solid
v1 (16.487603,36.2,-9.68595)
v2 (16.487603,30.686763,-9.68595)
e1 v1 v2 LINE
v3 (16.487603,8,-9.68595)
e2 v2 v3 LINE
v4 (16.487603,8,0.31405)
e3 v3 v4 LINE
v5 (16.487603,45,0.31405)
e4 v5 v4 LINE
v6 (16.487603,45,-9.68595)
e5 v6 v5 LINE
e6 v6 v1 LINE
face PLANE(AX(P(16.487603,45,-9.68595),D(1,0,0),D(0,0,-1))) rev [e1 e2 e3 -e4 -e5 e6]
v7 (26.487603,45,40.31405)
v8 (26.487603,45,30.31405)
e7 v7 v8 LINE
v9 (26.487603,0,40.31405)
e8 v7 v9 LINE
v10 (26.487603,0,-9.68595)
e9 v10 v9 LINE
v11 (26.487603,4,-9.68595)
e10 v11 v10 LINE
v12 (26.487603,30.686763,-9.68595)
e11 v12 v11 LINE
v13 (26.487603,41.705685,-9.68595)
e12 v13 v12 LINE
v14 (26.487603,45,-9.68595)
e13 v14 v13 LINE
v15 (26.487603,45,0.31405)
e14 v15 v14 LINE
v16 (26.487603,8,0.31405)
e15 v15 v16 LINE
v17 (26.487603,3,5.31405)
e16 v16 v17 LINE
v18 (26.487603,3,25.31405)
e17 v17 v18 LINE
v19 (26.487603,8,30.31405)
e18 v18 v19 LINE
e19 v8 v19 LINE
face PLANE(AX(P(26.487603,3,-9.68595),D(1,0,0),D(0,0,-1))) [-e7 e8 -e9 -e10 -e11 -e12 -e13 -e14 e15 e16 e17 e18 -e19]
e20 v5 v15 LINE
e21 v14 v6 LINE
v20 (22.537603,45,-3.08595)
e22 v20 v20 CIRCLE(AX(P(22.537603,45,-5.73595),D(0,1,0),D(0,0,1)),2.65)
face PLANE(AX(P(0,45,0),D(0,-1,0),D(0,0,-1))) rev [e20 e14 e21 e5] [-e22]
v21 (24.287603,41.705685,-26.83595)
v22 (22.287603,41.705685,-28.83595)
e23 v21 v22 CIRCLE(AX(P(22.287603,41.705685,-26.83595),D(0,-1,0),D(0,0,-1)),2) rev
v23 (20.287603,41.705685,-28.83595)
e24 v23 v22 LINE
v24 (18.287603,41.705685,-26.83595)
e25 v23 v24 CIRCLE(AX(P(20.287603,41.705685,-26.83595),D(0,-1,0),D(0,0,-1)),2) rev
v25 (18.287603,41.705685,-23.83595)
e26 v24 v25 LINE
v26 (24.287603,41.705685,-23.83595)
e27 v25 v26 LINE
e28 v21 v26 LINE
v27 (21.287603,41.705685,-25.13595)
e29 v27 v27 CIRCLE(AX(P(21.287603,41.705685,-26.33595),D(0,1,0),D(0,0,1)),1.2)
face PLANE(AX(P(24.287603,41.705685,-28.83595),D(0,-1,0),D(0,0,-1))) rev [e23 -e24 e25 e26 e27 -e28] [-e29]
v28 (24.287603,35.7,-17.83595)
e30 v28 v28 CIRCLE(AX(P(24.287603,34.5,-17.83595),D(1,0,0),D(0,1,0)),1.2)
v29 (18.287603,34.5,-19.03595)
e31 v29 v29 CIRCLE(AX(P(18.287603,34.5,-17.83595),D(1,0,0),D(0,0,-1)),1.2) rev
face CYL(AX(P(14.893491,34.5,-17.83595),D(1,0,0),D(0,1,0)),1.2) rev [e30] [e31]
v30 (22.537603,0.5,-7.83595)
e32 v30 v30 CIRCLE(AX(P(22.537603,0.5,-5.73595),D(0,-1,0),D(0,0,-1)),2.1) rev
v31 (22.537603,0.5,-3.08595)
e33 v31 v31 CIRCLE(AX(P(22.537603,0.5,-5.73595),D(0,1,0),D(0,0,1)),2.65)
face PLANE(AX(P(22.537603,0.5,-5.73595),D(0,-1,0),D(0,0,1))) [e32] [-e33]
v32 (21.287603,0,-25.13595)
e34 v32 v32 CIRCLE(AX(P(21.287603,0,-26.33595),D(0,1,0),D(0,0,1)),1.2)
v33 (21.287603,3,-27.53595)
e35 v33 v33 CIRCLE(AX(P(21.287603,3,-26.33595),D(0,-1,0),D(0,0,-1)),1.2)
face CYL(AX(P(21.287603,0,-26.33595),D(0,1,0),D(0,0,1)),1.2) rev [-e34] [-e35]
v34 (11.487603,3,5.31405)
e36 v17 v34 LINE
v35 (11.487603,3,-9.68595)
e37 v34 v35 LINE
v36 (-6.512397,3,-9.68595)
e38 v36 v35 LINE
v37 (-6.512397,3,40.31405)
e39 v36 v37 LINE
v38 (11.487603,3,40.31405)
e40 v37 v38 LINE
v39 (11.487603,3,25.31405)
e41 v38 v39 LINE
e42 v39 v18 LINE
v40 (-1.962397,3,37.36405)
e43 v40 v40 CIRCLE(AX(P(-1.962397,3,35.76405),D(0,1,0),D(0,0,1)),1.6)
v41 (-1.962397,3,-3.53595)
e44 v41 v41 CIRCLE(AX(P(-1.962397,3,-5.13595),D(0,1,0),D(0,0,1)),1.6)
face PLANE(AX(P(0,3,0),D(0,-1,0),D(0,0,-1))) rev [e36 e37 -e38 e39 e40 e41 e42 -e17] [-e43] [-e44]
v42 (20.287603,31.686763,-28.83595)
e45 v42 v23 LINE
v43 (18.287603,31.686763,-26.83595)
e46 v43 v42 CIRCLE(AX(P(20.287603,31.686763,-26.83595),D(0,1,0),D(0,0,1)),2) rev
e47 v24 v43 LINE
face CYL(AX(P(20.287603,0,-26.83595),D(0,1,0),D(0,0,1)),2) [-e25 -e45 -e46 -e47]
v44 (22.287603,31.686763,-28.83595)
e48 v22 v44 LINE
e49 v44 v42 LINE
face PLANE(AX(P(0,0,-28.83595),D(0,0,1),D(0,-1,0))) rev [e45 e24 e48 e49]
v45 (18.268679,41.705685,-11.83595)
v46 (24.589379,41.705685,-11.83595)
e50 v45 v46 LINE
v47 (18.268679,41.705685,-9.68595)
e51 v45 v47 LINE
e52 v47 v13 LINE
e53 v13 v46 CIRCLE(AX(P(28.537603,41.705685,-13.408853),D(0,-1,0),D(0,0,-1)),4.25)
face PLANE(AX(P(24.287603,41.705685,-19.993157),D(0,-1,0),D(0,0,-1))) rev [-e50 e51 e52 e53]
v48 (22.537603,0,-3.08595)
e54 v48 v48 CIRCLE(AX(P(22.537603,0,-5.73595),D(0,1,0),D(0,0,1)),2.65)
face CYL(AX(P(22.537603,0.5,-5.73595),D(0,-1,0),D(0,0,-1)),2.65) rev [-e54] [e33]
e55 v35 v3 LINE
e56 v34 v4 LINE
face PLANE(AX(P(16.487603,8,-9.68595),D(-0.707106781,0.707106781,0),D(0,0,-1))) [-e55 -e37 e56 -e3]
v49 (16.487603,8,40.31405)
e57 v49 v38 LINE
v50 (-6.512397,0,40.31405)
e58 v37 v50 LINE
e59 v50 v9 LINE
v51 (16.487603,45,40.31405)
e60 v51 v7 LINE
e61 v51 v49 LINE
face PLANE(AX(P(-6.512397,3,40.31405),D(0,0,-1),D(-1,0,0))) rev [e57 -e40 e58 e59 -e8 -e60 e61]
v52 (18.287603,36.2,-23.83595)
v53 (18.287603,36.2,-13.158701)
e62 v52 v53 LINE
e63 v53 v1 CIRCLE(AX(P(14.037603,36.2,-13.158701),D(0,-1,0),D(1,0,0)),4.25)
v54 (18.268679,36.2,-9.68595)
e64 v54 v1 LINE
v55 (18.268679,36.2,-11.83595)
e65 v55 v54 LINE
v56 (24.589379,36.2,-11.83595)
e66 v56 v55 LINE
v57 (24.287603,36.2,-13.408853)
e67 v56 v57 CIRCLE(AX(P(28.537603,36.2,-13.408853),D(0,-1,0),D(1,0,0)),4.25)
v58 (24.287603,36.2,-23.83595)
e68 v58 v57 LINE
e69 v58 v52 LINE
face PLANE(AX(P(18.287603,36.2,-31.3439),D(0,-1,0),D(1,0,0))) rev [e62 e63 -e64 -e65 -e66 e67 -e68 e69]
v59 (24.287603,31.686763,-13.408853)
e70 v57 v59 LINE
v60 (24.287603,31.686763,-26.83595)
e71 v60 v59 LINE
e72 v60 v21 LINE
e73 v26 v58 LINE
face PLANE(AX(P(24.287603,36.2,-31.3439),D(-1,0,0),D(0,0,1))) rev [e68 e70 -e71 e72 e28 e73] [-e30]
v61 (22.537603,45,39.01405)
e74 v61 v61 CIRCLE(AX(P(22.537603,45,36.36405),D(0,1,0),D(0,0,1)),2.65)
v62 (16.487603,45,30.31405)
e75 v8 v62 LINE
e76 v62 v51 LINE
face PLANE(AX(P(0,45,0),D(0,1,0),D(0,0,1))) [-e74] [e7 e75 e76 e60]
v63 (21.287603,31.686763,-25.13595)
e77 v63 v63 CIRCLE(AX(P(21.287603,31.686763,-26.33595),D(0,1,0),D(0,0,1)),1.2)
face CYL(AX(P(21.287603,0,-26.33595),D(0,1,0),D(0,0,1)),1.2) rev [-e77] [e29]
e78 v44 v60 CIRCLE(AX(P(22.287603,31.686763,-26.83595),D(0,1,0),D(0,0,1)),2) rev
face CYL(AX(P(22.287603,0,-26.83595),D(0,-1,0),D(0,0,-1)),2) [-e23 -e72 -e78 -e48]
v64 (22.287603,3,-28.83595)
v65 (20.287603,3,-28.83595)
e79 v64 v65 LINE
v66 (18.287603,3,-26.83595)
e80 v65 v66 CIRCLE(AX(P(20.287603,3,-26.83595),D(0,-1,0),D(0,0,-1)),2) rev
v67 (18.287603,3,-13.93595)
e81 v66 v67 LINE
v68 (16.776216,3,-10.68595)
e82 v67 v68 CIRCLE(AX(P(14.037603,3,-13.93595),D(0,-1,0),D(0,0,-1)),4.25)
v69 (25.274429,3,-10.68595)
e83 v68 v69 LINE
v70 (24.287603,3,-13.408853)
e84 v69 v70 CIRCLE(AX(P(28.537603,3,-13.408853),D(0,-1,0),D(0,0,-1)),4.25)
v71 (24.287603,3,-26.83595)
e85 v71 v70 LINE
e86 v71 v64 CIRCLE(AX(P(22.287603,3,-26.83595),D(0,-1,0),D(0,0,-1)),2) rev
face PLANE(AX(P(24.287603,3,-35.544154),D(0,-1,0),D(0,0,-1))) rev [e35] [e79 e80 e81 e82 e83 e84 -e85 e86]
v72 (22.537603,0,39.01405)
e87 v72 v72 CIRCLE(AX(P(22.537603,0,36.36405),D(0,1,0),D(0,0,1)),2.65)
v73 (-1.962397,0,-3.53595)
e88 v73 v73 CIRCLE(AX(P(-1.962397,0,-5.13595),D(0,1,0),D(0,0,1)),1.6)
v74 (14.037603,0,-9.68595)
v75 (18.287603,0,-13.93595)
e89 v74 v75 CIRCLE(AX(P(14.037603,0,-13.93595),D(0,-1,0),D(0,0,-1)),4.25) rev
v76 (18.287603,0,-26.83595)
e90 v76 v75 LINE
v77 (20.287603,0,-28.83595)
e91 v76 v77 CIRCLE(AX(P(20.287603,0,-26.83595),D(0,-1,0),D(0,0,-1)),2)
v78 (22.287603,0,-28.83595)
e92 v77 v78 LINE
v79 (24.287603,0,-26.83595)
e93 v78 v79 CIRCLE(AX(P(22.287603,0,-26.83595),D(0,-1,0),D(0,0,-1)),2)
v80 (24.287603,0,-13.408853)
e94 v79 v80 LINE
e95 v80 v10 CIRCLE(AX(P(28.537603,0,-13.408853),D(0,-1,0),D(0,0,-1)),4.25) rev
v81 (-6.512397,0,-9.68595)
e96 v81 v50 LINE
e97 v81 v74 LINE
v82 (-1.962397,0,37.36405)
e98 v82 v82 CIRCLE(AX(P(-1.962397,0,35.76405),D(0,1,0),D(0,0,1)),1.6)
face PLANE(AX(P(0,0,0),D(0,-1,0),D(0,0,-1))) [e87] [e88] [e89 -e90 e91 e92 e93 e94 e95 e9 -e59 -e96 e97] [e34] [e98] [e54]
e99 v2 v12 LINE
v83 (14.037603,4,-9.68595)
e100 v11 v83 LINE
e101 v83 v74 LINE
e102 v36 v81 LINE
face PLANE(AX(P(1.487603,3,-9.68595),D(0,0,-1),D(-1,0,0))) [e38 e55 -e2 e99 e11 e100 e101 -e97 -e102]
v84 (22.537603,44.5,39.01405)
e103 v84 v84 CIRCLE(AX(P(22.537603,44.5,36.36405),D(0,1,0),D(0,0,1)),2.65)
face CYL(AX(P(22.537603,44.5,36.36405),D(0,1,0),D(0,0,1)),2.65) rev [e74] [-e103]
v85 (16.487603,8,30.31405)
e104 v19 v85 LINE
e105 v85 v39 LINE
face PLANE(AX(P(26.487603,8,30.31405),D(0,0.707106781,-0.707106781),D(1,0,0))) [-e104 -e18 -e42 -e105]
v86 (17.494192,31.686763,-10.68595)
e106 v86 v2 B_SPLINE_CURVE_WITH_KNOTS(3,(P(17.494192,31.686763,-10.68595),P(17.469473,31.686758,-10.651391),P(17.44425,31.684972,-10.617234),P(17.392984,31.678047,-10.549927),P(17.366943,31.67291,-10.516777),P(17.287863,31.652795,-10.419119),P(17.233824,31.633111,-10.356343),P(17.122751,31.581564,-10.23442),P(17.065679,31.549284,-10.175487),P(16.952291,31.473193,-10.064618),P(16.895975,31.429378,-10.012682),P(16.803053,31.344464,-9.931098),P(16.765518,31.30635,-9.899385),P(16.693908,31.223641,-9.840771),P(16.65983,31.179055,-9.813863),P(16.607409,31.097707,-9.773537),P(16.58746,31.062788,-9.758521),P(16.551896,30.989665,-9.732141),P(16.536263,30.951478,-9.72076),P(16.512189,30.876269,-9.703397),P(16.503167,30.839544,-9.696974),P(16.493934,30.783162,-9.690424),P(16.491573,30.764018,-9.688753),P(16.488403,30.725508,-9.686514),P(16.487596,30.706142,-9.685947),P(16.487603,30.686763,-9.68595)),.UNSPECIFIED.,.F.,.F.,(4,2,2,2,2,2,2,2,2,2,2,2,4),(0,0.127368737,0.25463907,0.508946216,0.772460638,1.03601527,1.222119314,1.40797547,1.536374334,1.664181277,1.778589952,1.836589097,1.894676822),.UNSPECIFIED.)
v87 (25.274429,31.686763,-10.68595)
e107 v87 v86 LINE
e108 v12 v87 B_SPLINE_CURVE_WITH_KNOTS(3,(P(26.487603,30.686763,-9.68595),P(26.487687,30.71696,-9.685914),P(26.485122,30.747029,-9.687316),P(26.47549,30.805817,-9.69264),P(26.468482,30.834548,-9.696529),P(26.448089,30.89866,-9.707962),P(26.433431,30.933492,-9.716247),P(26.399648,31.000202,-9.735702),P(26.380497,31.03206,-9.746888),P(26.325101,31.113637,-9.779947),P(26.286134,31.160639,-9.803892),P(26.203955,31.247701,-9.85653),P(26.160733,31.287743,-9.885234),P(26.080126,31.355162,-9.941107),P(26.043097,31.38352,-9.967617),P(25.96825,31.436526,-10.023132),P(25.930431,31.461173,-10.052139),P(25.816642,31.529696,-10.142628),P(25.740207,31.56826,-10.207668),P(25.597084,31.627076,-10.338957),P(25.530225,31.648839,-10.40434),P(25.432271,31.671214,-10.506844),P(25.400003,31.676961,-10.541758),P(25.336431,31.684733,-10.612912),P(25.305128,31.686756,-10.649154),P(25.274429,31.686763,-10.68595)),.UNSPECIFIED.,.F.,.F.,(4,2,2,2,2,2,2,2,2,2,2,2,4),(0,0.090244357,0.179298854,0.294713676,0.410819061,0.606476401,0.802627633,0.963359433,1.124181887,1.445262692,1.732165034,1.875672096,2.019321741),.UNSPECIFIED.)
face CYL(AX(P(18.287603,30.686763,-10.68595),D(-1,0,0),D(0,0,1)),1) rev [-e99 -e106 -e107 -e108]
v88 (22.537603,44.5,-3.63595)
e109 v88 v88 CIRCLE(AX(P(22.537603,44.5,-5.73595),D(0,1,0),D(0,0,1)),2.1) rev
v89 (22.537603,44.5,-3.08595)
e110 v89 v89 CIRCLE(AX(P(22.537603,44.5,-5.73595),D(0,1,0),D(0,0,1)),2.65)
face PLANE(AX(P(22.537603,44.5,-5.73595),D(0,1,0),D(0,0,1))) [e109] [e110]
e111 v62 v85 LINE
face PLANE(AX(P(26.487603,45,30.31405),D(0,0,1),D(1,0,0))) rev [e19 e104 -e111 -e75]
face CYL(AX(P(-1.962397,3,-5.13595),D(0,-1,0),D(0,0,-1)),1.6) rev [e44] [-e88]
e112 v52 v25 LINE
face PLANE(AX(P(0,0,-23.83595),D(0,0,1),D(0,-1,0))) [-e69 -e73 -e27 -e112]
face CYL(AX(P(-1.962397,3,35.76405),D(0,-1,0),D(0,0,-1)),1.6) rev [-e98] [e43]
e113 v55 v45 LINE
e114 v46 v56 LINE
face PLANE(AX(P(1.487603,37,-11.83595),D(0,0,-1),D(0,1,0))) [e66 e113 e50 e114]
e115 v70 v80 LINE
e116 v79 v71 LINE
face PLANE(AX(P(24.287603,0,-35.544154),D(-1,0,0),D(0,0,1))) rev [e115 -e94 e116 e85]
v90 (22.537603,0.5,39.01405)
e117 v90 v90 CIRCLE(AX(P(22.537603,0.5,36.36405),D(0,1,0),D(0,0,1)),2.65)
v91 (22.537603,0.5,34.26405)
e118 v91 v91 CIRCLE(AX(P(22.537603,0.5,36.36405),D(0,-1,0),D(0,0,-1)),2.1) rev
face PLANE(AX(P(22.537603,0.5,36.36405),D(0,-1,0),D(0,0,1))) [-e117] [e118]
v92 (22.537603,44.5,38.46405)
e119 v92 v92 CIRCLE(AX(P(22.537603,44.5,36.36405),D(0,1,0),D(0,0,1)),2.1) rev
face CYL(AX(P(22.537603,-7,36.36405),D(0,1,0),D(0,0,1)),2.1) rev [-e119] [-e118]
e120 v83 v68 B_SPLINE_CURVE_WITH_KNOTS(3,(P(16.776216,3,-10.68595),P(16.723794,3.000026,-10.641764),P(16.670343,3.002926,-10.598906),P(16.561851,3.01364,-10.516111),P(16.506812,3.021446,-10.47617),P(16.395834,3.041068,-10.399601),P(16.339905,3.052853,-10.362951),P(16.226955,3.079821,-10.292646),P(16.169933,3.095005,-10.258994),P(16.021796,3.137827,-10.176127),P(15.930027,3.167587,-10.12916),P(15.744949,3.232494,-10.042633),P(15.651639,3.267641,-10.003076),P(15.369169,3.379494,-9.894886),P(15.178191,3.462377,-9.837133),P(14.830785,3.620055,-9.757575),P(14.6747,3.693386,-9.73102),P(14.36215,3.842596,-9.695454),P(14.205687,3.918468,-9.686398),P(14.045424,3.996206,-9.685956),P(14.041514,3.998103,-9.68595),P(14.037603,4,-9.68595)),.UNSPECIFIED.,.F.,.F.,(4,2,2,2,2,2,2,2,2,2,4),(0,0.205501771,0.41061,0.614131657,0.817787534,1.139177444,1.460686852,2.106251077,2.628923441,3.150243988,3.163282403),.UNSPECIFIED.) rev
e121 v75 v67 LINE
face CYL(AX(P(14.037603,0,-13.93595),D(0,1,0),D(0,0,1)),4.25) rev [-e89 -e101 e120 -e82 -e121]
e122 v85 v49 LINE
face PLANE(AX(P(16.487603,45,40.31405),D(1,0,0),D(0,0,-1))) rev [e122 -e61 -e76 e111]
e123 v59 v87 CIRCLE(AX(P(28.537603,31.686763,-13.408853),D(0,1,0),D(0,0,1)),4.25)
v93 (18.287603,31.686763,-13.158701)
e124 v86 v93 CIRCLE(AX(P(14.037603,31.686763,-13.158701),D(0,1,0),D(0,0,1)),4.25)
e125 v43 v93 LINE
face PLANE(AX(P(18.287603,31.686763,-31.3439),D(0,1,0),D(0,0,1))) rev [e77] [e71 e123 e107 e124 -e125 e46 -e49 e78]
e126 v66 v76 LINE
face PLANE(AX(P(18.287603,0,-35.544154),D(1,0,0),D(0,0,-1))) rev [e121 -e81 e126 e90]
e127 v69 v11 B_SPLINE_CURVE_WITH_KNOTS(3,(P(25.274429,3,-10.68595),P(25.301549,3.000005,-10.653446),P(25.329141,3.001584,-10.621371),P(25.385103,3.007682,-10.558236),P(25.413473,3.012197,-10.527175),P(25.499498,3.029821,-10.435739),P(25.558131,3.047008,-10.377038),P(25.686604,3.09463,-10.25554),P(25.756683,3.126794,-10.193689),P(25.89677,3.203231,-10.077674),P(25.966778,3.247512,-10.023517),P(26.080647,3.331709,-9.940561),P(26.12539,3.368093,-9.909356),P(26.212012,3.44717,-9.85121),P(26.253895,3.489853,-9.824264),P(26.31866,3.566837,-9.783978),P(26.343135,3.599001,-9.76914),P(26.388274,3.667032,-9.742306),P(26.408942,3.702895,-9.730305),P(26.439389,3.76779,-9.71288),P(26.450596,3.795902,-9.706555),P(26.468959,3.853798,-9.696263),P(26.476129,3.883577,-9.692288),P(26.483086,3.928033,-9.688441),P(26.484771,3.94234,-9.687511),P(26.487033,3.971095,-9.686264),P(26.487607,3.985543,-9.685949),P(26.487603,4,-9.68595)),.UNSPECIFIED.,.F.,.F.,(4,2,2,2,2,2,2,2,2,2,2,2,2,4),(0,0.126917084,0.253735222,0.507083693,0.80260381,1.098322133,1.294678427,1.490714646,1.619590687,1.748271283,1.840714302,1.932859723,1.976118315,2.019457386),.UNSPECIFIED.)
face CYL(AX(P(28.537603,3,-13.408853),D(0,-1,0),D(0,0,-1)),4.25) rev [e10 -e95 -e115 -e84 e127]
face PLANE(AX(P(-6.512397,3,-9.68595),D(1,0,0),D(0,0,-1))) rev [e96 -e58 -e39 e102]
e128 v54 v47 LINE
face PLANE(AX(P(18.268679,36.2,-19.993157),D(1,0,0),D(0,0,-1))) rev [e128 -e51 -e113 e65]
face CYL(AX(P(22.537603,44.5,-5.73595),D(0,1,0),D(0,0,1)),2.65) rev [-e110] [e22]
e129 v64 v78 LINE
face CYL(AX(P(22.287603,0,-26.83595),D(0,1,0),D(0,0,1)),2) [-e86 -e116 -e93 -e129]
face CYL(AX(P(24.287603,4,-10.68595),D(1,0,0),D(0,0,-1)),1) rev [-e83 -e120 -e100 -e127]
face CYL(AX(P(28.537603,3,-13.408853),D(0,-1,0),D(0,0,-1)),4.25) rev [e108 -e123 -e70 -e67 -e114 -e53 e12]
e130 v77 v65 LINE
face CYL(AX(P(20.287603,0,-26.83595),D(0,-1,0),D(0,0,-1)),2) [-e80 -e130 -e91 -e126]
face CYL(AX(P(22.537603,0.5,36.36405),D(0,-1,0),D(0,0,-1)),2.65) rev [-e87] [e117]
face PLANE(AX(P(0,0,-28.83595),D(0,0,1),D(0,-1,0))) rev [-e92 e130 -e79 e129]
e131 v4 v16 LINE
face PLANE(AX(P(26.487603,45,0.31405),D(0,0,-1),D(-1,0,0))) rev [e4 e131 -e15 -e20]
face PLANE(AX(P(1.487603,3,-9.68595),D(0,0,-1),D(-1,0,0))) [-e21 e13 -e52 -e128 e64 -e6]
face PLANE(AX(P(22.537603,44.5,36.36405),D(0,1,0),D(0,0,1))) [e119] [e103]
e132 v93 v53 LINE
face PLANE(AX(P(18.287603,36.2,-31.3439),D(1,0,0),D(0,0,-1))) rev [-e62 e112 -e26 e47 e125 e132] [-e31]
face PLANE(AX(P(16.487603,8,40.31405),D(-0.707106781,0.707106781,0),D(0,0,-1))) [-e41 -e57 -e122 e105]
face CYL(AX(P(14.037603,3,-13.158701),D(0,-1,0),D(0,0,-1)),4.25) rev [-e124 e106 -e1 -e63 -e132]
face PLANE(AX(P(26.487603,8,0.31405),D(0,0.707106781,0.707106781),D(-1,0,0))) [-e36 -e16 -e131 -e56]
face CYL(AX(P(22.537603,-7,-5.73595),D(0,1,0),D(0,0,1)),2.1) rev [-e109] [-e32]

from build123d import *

# Parameters (mm, degrees)
SKETCH1_R           = 1.6
BOSS_EXTRUDE1_DEPTH = 3
SKETCH2_W           = 10
SKETCH2_H           = 10
BOSS_EXTRUDE2_DEPTH = 42
CHAMFER1_SIZE       = 5
SKETCH3_R           = 2.1
CUT_EXTRUDE1_DEPTH  = 52
SKETCH4_R           = 2.65
CUT_EXTRUDE2_DEPTH  = 0.5
SKETCH5_W           = 6
SKETCH5_H           = 4.513236852
BOSS_EXTRUDE3_DEPTH = 14.15
SKETCH6_R           = 1.2
CUT_EXTRUDE3_DEPTH  = 6
SKETCH7_W           = 6
SKETCH7_H           = 10.018921585
BOSS_EXTRUDE4_DEPTH = 5
SKETCH8_W           = 6.018924213
SKETCH8_H           = 5.505684733
BOSS_EXTRUDE5_DEPTH = 2.15
SKETCH9_W           = 6
SKETCH9_H           = 3
BOSS_EXTRUDE6_DEPTH = 19.15
SKETCH10_R          = 1.2
CUT_EXTRUDE4_DEPTH  = 64.766604599
FILLET3_R           = 2
FILLET4_R           = 4.25
FILLET5_R           = 4.25
FILLET6_R           = 4.25
FILLET7_R           = 4.25
FILLET8_START       = 17.362615229
FILLET8_DEPTH       = 7.820980384
FILLET8_START_2     = 14.037603206
FILLET8_2_DEPTH     = 12.4500001
FILLET8_START_3     = 3
FILLET8_3_DEPTH     = 2
FILLET9_R           = 1


with BuildPart() as part:
    # Sketch1 → Boss-Extrude1 (new body)
    with BuildSketch(Plane(origin=(0, 0, 0), x_dir=(1, 0, 0), z_dir=(0, 1, 0))):
        Polygon((-6.512396694, 9.685950413), (1.487603306, 9.685950413), (26.487603306, 9.685950413), (26.487603306, -40.314049587), (1.487603306, -40.314049587), (-6.512396694, -40.314049587), align=None)
        with Locations(Location((-1.962396694, -35.764049587, 0), (0, 0, 270))):
            Circle(SKETCH1_R, mode=Mode.SUBTRACT)
        with Locations(Location((-1.962396694, 5.135950413, 0), (0, 0, 270))):
            Circle(SKETCH1_R, mode=Mode.SUBTRACT)
    extrude(amount=BOSS_EXTRUDE1_DEPTH)

    # Sketch2 → Boss-Extrude2 (add)
    with BuildSketch(Plane(origin=(0, 3, 0), x_dir=(1, 0, 0), z_dir=(0, 1, 0))):
        with Locations((21.487603306, -35.314049587)):
            Rectangle(SKETCH2_W, SKETCH2_H)
        with Locations((21.487603306, 4.685950413)):
            Rectangle(SKETCH2_W, SKETCH2_H)
    extrude(amount=BOSS_EXTRUDE2_DEPTH)

    # Chamfer1
    chamfer1_edges = [part.edges().sort_by_distance(p)[0] for p in [
        (21.487603306, 3, 30.314049587),
        (16.487603306, 3, 35.314049587),
        (16.487603306, 3, -4.685950413),
        (21.487603306, 3, 0.314049587),
    ]]
    chamfer(chamfer1_edges, length=CHAMFER1_SIZE)

    # Sketch3 → Cut-Extrude1 (cut)
    with BuildSketch(Plane(origin=(0, 45, 0), x_dir=(1, 0, 0), z_dir=(0, 1, 0))):
        with Locations(Location((22.537603306, -36.364049587, 0), (0, 0, 270))):
            Circle(SKETCH3_R)
        with Locations(Location((22.537603306, 5.735950413, 0), (0, 0, 270))):
            Circle(SKETCH3_R)
    extrude(amount=-CUT_EXTRUDE1_DEPTH, mode=Mode.SUBTRACT)

    # Sketch4 → Cut-Extrude2 (cut)
    with BuildSketch(Plane(origin=(0, 45, 0), x_dir=(1, 0, 0), z_dir=(0, 1, 0))):
        with Locations(Location((22.537603306, -36.364049587, 0), (0, 0, 270))):
            Circle(SKETCH4_R)
        with Locations(Location((22.537603306, 5.735950413, 0), (0, 0, 270))):
            Circle(SKETCH4_R)
    cut_extrude2 = extrude(amount=-CUT_EXTRUDE2_DEPTH, mode=Mode.SUBTRACT)

    # Mirror1: Cut-Extrude2 across plane
    add(cut_extrude2.mirror(Plane(origin=(0, 22.5, 0), x_dir=(0, 0, 1), z_dir=(0, -1, 0))), mode=Mode.SUBTRACT)

    # Sketch5 → Boss-Extrude3 (add)
    with BuildSketch(Plane(origin=(0, 0, -9.685950413), x_dir=(-1, 0, 0), z_dir=(0, 0, -1))):
        with Locations((-21.287603306, 33.943381574)):
            Rectangle(SKETCH5_W, SKETCH5_H)
    extrude(amount=BOSS_EXTRUDE3_DEPTH)

    # Sketch6 → Cut-Extrude3 (cut)
    with BuildSketch(Plane(origin=(24.287603306, 0, 0), x_dir=(0, 0, -1), z_dir=(1, 0, 0))):
        with Locations(Location((17.835950413, 34.5, 0), (0, 0, 90))):
            Circle(SKETCH6_R)
    extrude(amount=-CUT_EXTRUDE3_DEPTH, mode=Mode.SUBTRACT)

    # Sketch7 → Boss-Extrude4 (add)
    with BuildSketch(Plane(origin=(0, 0, -23.835950413), x_dir=(-1, 0, 0), z_dir=(0, 0, -1))):
        with Locations((-21.287603306, 36.696223941)):
            Rectangle(SKETCH7_W, SKETCH7_H)
    extrude(amount=BOSS_EXTRUDE4_DEPTH)

    # Sketch8 → Boss-Extrude5 (add)
    with BuildSketch(Plane(origin=(0, 0, -9.685950413), x_dir=(-1, 0, 0), z_dir=(0, 0, -1))):
        with Locations((-21.278141199, 38.952842367)):
            Rectangle(SKETCH8_W, SKETCH8_H)
    extrude(amount=BOSS_EXTRUDE5_DEPTH)

    # Sketch9 → Boss-Extrude6 (add)
    with BuildSketch(Plane(origin=(0, 0, -9.685950413), x_dir=(-1, 0, 0), z_dir=(0, 0, -1))):
        with Locations((-21.287603306, 1.5)):
            Rectangle(SKETCH9_W, SKETCH9_H)
    extrude(amount=BOSS_EXTRUDE6_DEPTH)

    # Sketch10 → Cut-Extrude4 (cut, through all)
    with BuildSketch(Plane(origin=(0, 41.705684733, 0), x_dir=(1, 0, 0), z_dir=(0, 1, 0))):
        with Locations(Location((21.287603306, 26.335950413, 0), (0, 0, 270))):
            Circle(SKETCH10_R)
    extrude(amount=-CUT_EXTRUDE4_DEPTH, mode=Mode.SUBTRACT)

    # Fillet3
    fillet3_edges = [part.edges().sort_by_distance(p)[0] for p in [
        (24.287603306, 36.696223941, -28.835950413),
        (18.287603306, 36.696223941, -28.835950413),
        (18.287603306, 1.5, -28.835950413),
        (24.287603306, 1.5, -28.835950413),
    ]]
    fillet(fillet3_edges, radius=FILLET3_R)

    # Fillet4
    # the kernel refuses this fillet: 4.25 mm, written as the material it adds along each edge
    with BuildSketch(Plane(origin=(24.287603306, 3, -9.685950413), x_dir=(0, 0, -1), z_dir=(0, -1, 0))) as fillet4_piece_1:
        with BuildLine():
            CenterArc((3.722902094, 4.25), FILLET4_R, 208.839189401, 61.160810599)
            Line((0, 2.2), (-0.074458042, 2.159))
            ThreePointArc((-0.074458042, 2.159), (-0.085, 1.1), (-0.085, 0))
            Line((-0.085, 0), (0, -0.085))
            Line((0, -0.085), (3.722902094, -0.085))
            Line((3.722902094, -0.085), (3.722902094, 0))
        make_face()
    extrude(amount=3)

    # Fillet5
    fillet5_edges = [part.edges().sort_by_distance(p)[0] for p in [
        (18.287603306, 1.5, -9.685950413),
    ]]
    fillet(fillet5_edges, radius=FILLET5_R)

    # Fillet6
    # the kernel refuses this fillet: 4.25 mm, written as the material it adds along each edge
    with BuildSketch(Plane(origin=(24.287603306, 31.686763148, -9.685950413), x_dir=(1, 0, 0), z_dir=(0, 1, 0))) as fillet6_piece_1_section:
        with BuildLine():
            CenterArc((4.25, 3.722902094), FILLET6_R, 180, 61.160810599)
            Line((0, 3.722902094), (-0.085, 3.722902094))
            Line((-0.085, 3.722902094), (-0.085, 0))
            Line((-0.085, 0), (0, -0.085))
            ThreePointArc((0, -0.085), (1.1, -0.085), (2.159, -0.074458042))
            Line((2.159, -0.074458042), (2.2, 0))
        make_face()
    fillet6_piece_1 = extrude(amount=10.018921585, mode=Mode.PRIVATE)
    fillet6_piece_1 = split(fillet6_piece_1, bisect_by=Plane(origin=(24.287603306, 31.686763148, -11.835950413), z_dir=(0, 0, 1)), keep=Keep.TOP, mode=Mode.PRIVATE)
    fillet6_piece_1 = split(fillet6_piece_1, bisect_by=Plane(origin=(24.287603306, 36.2, -9.685950413), z_dir=(0, -1, 0)), keep=Keep.TOP, mode=Mode.PRIVATE)
    add(fillet6_piece_1)
    with BuildSketch(Plane(origin=(24.287603306, 31.686763148, -9.685950413), x_dir=(1, 0, 0), z_dir=(0, 1, 0))) as fillet6_piece_2_section:
        with BuildLine():
            CenterArc((4.25, 3.722902094), FILLET6_R, 180, 61.160810599)
            Line((0, 3.722902094), (-0.085, 3.722902094))
            Line((-0.085, 3.722902094), (-0.085, 0))
            Line((-0.085, 0), (0, -0.085))
            ThreePointArc((0, -0.085), (1.1, -0.085), (2.159, -0.074458042))
            Line((2.159, -0.074458042), (2.2, 0))
        make_face()
    fillet6_piece_2 = extrude(amount=10.018921585, mode=Mode.PRIVATE)
    fillet6_piece_2 = split(fillet6_piece_2, bisect_by=Plane(origin=(24.287603306, 31.686763148, -11.835950413), z_dir=(0, 0, -1)), keep=Keep.TOP, mode=Mode.PRIVATE)
    fillet6_piece_2 = split(fillet6_piece_2, bisect_by=Plane(origin=(24.287603306, 36.2, -9.685950413), z_dir=(0, -1, 0)), keep=Keep.TOP, mode=Mode.PRIVATE)
    add(fillet6_piece_2)
    with BuildSketch(Plane(origin=(24.287603306, 31.686763148, -9.685950413), x_dir=(1, 0, 0), z_dir=(0, 1, 0))) as fillet6_piece_3_section:
        with BuildLine():
            CenterArc((4.25, 3.722902094), FILLET6_R, 180, 61.160810599)
            Line((0, 3.722902094), (-0.085, 3.722902094))
            Line((-0.085, 3.722902094), (-0.085, 0))
            Line((-0.085, 0), (0, -0.085))
            ThreePointArc((0, -0.085), (1.1, -0.085), (2.159, -0.074458042))
            Line((2.159, -0.074458042), (2.2, 0))
        make_face()
    fillet6_piece_3 = extrude(amount=10.018921585, mode=Mode.PRIVATE)
    fillet6_piece_3 = split(fillet6_piece_3, bisect_by=Plane(origin=(24.287603306, 31.686763148, -11.835950413), z_dir=(0, 0, 1)), keep=Keep.TOP, mode=Mode.PRIVATE)
    fillet6_piece_3 = split(fillet6_piece_3, bisect_by=Plane(origin=(24.287603306, 36.2, -9.685950413), z_dir=(0, 1, 0)), keep=Keep.TOP, mode=Mode.PRIVATE)
    add(fillet6_piece_3)

    # Fillet7
    # the kernel refuses this fillet: 4.25 mm, written as the material it adds along each edge
    with BuildSketch(Plane(origin=(18.287603306, 31.686763148, -9.685950413), x_dir=(0, 0, -1), z_dir=(0, 1, 0))) as fillet7_piece_1:
        with BuildLine():
            CenterArc((3.472751071, 4.25), FILLET7_R, 215.202683568, 54.797316432)
            Line((0, 1.8), (0, 0))
            Line((0, 0), (3.472751071, 0))
        make_face()
    extrude(amount=4.513236852)

    # Fillet8: read off the stored shape, not the designer's step
    # Fillet8 outline → Fillet8 (add)
    with BuildSketch(Plane.YZ.offset(FILLET8_START)):
        with BuildLine():
            ThreePointArc((3, -10.685950413), (3.292893219, -9.978843632), (4, -9.685950413))
            Line((4, -9.685950413), (3, -9.685950413))
            Line((3, -9.685950413), (3, -10.685950413))
        make_face()
    extrude(amount=FILLET8_DEPTH)

    # Fillet8 2 outline → Fillet8 2 (add)
    with BuildSketch(Plane.YZ.offset(FILLET8_START_2)):
        with BuildLine():
            ThreePointArc((3, -10.685950413), (3.292893219, -9.978843632), (4, -9.685950413))
            Line((4, -9.685950413), (3, -9.685950413))
            Line((3, -9.685950413), (3, -10.685950413))
        make_face()
    extrude(amount=FILLET8_2_DEPTH)

    # Fillet8 3 outline → Fillet8 3 (cut)
    with BuildSketch(Plane(origin=(0, 0, 0), x_dir=(1, 0, 0), z_dir=(0, 1, 0)).offset(FILLET8_START_3)):
        with BuildLine():
            ThreePointArc((25.274429362, 10.685950413), (25.834372953, 10.129363879), (26.487603306, 9.685950413))
            Line((26.487603306, 9.685950413), (26.487603306, 10.685950413))
            Line((26.487603306, 10.685950413), (25.274429362, 10.685950413))
        make_face()
        with BuildLine():
            Line((14.037603206, 10.685950413), (14.037603306, 9.685950413))
            ThreePointArc((14.037603306, 9.685950413), (15.495341279, 9.943770557), (16.776216093, 10.685950413))
            Line((16.776216093, 10.685950413), (14.037603206, 10.685950413))
        make_face()
    extrude(amount=FILLET8_3_DEPTH, mode=Mode.SUBTRACT)

    # Fillet9
    # the kernel refuses this fillet: 1 mm, written as the material it adds along each edge
    with BuildSketch(Plane(origin=(26.487603306, 31.686763148, -9.685950413), x_dir=(0, -1, 0), z_dir=(-1, 0, 0))) as fillet9_piece_1_section:
        with BuildLine():
            CenterArc((FILLET9_R, -FILLET9_R), FILLET9_R, 90, 90)
            Line((0, -FILLET9_R), (0, 0))
            Line((0, 0), (FILLET9_R, 0))
        make_face()
    fillet9_piece_1 = extrude(amount=10, mode=Mode.PRIVATE)
    fillet9_piece_1 = fillet9_piece_1 - Plane(origin=(14.037603306, 31.686763148, -13.158701484), x_dir=(0, 0, -1), z_dir=(0, -1, 0)) * Cylinder(4.25, 25, mode=Mode.PRIVATE)
    fillet9_piece_1 = fillet9_piece_1 - Plane(origin=(28.537603306, 31.686763148, -13.408852507), x_dir=(1, 0, 0), z_dir=(0, -1, 0)) * Cylinder(4.25, 25, mode=Mode.PRIVATE)
    add(fillet9_piece_1)


solid = part.part
